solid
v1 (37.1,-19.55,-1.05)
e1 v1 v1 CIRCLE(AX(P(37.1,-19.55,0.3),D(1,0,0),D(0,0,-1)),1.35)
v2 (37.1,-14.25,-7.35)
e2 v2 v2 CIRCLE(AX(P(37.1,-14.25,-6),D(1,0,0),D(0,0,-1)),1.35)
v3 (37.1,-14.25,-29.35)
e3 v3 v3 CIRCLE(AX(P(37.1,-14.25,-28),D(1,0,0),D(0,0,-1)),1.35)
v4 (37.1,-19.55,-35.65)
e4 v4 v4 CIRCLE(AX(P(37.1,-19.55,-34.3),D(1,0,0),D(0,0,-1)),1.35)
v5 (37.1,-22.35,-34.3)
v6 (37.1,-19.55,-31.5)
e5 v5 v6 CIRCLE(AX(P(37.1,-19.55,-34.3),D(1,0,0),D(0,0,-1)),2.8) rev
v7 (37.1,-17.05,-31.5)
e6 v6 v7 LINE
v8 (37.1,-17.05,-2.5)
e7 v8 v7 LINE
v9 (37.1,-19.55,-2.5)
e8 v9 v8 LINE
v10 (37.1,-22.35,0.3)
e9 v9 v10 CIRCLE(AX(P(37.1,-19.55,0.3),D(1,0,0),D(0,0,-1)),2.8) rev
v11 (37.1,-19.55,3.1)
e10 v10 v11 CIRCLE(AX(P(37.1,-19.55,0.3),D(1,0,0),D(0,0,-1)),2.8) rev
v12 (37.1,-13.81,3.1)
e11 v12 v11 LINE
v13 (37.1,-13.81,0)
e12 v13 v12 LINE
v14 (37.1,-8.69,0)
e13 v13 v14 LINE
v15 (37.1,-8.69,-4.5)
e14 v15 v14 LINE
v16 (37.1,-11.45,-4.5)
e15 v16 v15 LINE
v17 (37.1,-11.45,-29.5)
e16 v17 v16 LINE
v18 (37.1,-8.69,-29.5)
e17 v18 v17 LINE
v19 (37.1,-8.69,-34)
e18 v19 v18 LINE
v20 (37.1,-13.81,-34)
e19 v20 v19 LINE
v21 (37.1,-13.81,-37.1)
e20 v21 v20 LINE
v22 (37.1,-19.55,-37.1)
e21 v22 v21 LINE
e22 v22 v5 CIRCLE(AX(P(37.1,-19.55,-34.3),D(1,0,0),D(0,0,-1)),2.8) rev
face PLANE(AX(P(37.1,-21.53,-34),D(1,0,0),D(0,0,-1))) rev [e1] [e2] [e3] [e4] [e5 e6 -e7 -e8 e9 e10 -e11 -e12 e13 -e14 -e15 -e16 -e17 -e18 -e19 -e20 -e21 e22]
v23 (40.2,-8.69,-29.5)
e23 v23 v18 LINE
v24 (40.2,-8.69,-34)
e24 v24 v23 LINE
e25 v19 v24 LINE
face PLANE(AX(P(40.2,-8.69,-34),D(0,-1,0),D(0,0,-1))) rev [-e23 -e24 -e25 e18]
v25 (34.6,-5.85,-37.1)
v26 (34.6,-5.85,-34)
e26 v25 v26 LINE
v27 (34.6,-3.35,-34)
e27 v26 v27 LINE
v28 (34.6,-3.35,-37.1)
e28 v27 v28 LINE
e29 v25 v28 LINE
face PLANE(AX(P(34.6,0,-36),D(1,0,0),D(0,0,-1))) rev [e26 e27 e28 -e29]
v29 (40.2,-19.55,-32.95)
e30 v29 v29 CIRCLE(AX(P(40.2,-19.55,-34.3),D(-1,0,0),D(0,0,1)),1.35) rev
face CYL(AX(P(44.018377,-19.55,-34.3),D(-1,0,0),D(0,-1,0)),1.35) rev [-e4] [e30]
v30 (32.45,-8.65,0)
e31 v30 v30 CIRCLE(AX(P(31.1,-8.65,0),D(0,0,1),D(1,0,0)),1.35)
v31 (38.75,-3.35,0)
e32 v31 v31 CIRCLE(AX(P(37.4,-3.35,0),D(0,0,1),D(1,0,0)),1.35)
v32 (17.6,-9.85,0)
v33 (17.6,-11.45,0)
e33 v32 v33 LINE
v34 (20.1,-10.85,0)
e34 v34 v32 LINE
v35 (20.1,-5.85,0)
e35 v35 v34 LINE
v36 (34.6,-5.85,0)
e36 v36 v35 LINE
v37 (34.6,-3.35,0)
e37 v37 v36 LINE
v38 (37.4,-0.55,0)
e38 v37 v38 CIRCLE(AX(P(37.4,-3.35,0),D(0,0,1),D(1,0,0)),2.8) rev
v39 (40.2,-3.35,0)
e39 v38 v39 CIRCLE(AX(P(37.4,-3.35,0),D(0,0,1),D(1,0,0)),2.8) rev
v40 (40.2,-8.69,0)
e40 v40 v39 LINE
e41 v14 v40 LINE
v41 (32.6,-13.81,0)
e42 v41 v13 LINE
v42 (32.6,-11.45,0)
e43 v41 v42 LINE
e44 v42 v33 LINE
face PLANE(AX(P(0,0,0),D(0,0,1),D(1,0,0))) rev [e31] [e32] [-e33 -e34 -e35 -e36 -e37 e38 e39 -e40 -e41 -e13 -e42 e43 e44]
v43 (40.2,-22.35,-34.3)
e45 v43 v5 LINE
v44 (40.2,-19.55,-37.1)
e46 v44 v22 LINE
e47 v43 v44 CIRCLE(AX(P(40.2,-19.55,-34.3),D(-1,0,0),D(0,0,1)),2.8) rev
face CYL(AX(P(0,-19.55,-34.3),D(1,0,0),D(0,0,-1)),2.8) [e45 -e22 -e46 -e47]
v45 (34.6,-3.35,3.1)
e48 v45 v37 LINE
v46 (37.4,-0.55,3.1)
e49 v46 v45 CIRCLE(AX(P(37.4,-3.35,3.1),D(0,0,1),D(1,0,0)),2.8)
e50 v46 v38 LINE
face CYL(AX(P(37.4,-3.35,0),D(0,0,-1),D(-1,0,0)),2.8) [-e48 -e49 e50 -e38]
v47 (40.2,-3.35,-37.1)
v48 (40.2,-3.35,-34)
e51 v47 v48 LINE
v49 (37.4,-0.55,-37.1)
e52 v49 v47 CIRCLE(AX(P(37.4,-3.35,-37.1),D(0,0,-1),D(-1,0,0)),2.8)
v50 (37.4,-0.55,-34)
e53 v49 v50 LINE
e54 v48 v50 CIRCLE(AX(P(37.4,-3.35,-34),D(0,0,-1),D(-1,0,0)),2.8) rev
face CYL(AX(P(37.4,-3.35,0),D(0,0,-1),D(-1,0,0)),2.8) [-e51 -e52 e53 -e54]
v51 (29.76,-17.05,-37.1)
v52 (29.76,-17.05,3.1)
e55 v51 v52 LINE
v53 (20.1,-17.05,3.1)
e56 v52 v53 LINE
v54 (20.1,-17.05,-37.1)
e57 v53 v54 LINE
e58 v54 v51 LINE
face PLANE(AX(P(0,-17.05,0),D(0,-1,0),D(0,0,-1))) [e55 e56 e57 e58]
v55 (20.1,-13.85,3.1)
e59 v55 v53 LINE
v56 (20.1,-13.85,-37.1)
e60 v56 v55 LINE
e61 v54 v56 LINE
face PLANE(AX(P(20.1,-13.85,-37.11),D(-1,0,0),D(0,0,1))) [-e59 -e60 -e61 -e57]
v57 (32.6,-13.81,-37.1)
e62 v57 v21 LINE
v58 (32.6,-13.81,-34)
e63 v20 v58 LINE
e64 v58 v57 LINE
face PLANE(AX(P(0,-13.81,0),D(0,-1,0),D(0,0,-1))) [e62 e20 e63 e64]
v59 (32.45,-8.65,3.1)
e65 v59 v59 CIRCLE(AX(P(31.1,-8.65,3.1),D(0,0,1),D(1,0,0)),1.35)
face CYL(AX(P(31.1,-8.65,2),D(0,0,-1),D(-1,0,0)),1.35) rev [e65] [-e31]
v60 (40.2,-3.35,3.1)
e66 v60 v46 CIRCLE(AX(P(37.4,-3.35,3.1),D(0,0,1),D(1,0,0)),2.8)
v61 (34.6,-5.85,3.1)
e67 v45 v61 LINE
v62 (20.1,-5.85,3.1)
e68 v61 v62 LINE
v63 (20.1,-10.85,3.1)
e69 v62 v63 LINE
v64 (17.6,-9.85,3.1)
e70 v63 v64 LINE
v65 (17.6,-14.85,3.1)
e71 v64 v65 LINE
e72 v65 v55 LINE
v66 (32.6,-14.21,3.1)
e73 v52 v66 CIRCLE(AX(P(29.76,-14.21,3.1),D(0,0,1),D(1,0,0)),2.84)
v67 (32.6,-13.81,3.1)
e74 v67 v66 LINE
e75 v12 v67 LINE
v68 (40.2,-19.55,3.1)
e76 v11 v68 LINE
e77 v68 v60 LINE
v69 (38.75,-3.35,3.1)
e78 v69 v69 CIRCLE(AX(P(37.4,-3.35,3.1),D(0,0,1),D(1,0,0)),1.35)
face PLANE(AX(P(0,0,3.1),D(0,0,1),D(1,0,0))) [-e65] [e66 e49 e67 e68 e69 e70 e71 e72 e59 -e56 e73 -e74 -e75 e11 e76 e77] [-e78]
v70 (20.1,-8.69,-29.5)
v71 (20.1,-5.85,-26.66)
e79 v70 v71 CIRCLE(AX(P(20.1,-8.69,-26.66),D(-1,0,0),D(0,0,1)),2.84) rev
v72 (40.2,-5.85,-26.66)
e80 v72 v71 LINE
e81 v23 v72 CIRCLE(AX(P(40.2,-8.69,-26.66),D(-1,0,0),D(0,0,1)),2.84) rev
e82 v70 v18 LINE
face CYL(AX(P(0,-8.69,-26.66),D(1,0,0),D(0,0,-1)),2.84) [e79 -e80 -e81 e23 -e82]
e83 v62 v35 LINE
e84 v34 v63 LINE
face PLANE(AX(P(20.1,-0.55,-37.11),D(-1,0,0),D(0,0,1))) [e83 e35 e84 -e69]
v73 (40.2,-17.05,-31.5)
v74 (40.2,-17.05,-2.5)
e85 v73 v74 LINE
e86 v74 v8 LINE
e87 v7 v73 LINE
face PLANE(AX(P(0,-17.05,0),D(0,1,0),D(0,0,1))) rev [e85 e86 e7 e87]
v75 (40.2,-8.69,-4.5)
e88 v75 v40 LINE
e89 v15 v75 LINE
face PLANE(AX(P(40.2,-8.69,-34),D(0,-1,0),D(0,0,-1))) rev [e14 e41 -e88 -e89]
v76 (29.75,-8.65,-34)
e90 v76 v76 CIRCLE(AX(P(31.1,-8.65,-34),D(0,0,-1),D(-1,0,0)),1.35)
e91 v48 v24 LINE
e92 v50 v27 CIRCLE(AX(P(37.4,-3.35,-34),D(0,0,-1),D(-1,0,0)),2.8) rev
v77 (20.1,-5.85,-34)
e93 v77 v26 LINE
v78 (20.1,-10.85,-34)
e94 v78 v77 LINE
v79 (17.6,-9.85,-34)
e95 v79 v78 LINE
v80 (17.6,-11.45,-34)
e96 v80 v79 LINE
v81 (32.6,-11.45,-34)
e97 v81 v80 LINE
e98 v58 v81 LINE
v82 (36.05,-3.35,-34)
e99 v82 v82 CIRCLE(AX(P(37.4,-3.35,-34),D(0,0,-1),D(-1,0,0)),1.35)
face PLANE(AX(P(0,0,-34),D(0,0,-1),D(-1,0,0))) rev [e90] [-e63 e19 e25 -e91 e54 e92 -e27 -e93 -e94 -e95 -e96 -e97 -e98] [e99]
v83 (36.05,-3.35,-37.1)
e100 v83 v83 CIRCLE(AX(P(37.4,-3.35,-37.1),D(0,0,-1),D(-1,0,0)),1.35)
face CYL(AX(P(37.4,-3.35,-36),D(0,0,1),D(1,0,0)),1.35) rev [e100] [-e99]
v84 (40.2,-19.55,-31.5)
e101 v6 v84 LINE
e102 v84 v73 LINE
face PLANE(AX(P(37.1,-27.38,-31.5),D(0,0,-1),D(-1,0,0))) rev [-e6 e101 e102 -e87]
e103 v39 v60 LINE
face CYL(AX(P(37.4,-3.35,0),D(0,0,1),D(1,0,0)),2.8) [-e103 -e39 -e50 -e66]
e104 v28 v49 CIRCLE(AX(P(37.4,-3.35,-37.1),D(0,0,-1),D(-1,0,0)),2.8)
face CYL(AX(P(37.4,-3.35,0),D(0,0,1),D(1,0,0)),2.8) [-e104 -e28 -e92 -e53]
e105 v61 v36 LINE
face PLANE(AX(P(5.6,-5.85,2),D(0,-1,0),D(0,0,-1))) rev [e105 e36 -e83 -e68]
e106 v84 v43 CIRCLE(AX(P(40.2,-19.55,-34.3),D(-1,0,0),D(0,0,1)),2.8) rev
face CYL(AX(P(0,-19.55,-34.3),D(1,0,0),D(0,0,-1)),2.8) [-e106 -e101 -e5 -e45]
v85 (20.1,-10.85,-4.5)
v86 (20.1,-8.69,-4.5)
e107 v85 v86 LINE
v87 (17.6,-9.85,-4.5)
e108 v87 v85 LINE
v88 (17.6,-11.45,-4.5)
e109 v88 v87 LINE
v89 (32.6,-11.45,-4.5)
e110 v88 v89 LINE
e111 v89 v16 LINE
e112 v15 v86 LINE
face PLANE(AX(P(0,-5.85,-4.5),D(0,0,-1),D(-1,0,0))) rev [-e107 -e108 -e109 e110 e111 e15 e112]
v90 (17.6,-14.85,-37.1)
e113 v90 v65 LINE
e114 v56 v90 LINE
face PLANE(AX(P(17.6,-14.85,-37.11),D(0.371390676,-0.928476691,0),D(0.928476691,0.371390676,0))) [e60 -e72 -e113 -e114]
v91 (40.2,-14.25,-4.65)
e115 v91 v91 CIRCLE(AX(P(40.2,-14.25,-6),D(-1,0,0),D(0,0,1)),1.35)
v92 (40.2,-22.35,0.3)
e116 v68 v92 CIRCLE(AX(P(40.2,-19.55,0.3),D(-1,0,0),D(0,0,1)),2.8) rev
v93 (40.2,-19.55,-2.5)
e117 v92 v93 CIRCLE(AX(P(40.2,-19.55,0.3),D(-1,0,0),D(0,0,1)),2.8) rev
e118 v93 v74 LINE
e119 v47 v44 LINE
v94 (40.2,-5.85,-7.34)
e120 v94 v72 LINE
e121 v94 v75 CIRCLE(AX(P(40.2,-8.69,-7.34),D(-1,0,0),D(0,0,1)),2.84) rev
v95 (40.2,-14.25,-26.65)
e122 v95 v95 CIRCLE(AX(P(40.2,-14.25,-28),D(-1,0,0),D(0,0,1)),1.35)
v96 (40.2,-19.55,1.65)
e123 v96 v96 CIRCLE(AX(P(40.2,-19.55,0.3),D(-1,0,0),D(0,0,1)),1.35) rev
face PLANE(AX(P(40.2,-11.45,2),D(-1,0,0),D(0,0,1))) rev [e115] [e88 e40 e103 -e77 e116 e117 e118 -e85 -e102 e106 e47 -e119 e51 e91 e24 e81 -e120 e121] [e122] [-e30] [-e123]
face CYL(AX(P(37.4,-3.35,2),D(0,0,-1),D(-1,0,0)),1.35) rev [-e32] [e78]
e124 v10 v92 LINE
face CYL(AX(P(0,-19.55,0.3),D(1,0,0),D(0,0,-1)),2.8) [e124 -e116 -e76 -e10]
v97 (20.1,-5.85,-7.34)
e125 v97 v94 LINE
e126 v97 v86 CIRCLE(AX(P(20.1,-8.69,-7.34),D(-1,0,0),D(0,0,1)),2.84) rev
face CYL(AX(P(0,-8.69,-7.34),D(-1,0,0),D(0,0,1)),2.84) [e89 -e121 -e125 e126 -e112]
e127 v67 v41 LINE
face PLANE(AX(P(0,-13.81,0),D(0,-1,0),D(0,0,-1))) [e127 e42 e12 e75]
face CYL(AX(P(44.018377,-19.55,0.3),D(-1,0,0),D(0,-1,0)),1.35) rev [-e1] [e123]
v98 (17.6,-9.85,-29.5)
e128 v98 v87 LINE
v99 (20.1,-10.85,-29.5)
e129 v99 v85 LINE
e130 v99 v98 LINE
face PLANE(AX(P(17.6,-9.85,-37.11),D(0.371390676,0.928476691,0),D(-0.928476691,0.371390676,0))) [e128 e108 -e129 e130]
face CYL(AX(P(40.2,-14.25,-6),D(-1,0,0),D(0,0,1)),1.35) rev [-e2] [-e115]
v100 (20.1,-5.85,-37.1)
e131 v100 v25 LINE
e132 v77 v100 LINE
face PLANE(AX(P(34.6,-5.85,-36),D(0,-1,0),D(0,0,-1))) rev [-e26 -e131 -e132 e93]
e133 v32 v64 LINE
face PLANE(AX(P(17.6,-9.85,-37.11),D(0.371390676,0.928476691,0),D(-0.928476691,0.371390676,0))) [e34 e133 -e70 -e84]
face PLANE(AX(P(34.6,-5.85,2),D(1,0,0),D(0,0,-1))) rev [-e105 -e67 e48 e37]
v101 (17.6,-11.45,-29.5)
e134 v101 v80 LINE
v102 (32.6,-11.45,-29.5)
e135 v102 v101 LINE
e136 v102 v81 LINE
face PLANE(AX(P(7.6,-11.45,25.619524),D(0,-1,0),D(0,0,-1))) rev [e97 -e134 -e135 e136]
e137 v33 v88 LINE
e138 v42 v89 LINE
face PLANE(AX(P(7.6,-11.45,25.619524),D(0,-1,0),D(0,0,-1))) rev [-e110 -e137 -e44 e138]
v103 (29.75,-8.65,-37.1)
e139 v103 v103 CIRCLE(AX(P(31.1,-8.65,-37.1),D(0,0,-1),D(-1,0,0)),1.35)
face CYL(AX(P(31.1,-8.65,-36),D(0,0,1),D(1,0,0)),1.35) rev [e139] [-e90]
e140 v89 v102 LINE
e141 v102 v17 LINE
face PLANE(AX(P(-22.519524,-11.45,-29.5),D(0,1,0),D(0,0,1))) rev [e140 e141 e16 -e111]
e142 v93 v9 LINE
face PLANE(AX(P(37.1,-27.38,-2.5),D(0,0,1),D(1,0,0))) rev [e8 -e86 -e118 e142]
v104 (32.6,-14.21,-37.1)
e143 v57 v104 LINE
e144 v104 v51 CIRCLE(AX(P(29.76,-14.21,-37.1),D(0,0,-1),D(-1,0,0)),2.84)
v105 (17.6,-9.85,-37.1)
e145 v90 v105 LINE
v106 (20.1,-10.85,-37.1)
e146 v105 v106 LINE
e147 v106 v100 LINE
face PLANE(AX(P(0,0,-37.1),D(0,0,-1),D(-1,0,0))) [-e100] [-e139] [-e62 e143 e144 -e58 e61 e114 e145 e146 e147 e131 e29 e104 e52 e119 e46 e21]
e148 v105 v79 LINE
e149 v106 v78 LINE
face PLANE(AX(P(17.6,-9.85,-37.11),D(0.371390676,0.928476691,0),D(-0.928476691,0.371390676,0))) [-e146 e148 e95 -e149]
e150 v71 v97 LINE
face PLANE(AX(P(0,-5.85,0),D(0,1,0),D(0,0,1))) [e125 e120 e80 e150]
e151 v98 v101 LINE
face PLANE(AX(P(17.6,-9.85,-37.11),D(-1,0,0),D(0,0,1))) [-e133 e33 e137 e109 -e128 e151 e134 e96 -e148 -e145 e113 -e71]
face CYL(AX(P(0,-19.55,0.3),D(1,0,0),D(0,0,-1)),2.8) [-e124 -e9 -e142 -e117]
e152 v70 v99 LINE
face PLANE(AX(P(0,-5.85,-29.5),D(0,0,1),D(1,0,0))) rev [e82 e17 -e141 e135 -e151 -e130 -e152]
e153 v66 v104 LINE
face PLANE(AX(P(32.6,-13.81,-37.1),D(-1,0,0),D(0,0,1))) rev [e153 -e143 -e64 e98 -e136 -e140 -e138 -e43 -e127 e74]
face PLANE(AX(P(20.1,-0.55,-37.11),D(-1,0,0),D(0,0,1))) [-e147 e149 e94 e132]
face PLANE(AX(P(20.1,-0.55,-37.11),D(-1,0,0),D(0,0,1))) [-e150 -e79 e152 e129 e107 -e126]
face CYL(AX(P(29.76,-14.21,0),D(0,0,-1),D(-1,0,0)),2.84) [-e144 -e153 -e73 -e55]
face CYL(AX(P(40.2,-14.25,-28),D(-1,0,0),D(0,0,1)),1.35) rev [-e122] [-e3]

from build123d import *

# Parameters (mm, degrees)
ESBO_O1_R                  = 1.35
RESSALTO_EXTRUS_O1_DEPTH   = 2
ESBO_O3_W                  = 40.2
ESBO_O3_H                  = 2
RESSALTO_EXTRUS_O2_DEPTH   = 10.08
ESBO_O4_W                  = 3.1
ESBO_O4_H                  = 12.84
RESSALTO_EXTRUS_O3_DEPTH   = 34
CORTE_EXTRUS_O1_DEPTH      = 55.735280213
CORTE_EXTRUS_O1_DEPTH_BACK = 55.735280213
ESBO_O5_R                  = 1.35
ESBO_O7_W                  = 37.1
ESBO_O7_H                  = 3.24
CORTE_EXTRUS_O2_DEPTH      = 2
RESSALTO_EXTRUS_O5_START   = 2
ESBO_O12_R                 = 1.35
RESSALTO_EXTRUS_O5_DEPTH   = 2
ESBO_O18_W                 = 3.1
ESBO_O18_H                 = 3.24
RESSALTO_EXTRUS_O6_DEPTH   = 2
ESBO_O19_W                 = 3.1
ESBO_O19_H                 = 3.24
RESSALTO_EXTRUS_O7_DEPTH   = 2
ESBO_O21_R                 = 1.301764144
ESBO_O21_R_2               = 1.35
RESSALTO_EXTRUS_O8_DEPTH   = 1.1
RESSALTO_EXTRUS_O9_START   = 1.1
ESBO_O22_R                 = 1.35
RESSALTO_EXTRUS_O9_DEPTH   = 1.1
ESBO_O23_W                 = 3.1
ESBO_O23_H                 = 5.6
RESSALTO_EXTRUS_O10_DEPTH  = 5.85
CORTE_EXTRUS_O3_REACH      = 63.173
ESBO_O24_R                 = 1.35
ESBO_O25_W                 = 4.5
ESBO_O25_H                 = 3.1
CORTE_EXTRUS_O6_DEPTH      = 4.48
ESBO_O27_W                 = 3.1
ESBO_O27_H                 = 29
CORTE_EXTRUS_O7_DEPTH      = 4.48
ESBO_O28_W                 = 25
ESBO_O28_H                 = 40.2
CORTE_EXTRUS_O8_DEPTH      = 1.24
ESBO_O29_W                 = 25
ESBO_O29_H                 = 5.6
RESSALTO_EXTRUS_O11_DEPTH  = 34
ESBO_O31_W                 = 3.1
ESBO_O31_H                 = 25
RESSALTO_EXTRUS_O12_DEPTH  = 2.84
ESBO_O32_W                 = 25
ESBO_O32_H                 = 5.6
RESSALTO_EXTRUS_O13_DEPTH  = 34
FILETE1_R                  = 2.84
ESBO_O33_W                 = 5.6
ESBO_O33_H                 = 3.1
CORTE_EXTRUS_O9_DEPTH      = 0.55
ESBO_O35_W                 = 3.1
ESBO_O35_H                 = 5.6
CORTE_EXTRUS_O10_DEPTH     = 5.03
FILETE2_R                  = 2.8
DIVIDIR1_SURFACE_1_BACK    = 61.888
DIVIDIR1_SURFACE_1_DEPTH   = 123.776
DIVIDIR1_SURFACE_2_BACK    = 61.888
DIVIDIR1_SURFACE_2_DEPTH   = 123.776


# Read off the part's stored shape, not the designer's step: Corpo-Excluir/Manter 1
with BuildPart() as part:
    # Esboço1 → Ressalto-extrusão1 (new body)
    with BuildSketch(Plane.XY):
        Polygon((0, 0), (5.6, 0), (5.6, -5.85), (34.6, -5.85), (34.6, 0), (40.2, 0), (40.2, -11.45), (0, -11.45), align=None)
        with Locations((2.8, -3.35)):
            Circle(ESBO_O1_R, mode=Mode.SUBTRACT)
        with Locations((37.4, -3.35)):
            Circle(ESBO_O1_R, mode=Mode.SUBTRACT)
        with Locations((31.1, -8.65)):
            Circle(ESBO_O1_R, mode=Mode.SUBTRACT)
        with Locations((9.1, -8.65)):
            Circle(ESBO_O1_R, mode=Mode.SUBTRACT)
    extrude(amount=RESSALTO_EXTRUS_O1_DEPTH)

    # Esboço3 → Ressalto-extrusão2 (add)
    with BuildSketch(Plane.XZ.offset(11.45)):
        with Locations((20.1, 1)):
            Rectangle(ESBO_O3_W, ESBO_O3_H)
    extrude(amount=RESSALTO_EXTRUS_O2_DEPTH)

    # Esboço4 → Ressalto-extrusão3 (add)
    with BuildSketch(Plane(origin=(0, 0, 0), x_dir=(-1, 0, 0), z_dir=(0, 0, -1))):
        with Locations((-38.65, -15.11)):
            Rectangle(ESBO_O4_W, ESBO_O4_H)
        with Locations((-1.55, -15.11)):
            Rectangle(ESBO_O4_W, ESBO_O4_H)
    extrude(amount=RESSALTO_EXTRUS_O3_DEPTH)

    # Esboço5 → Corte-extrusão1 (cut, two sides: drawn at the far end of the back side and taken through both)
    with BuildSketch(Plane.ZY.offset(-37.1).offset(-CORTE_EXTRUS_O1_DEPTH_BACK)):
        with Locations((-6, -14.25)):
            Circle(ESBO_O5_R)
        with Locations((-28, -14.25)):
            Circle(ESBO_O5_R)
    extrude(amount=CORTE_EXTRUS_O1_DEPTH + CORTE_EXTRUS_O1_DEPTH_BACK, mode=Mode.SUBTRACT)

    # Esboço7 → Corte-extrusão2 (cut)
    with BuildSketch(Plane(origin=(0, 0, 0), x_dir=(-1, 0, 0), z_dir=(0, 0, -1))):
        with Locations((-18.55, -19.91)):
            Rectangle(ESBO_O7_W, ESBO_O7_H)
    extrude(amount=-CORTE_EXTRUS_O2_DEPTH, mode=Mode.SUBTRACT)

    # Esboço12 → Ressalto-extrusão5 (add)
    with BuildSketch(Plane(origin=(0, 0, -34), x_dir=(-1, 0, 0), z_dir=(0, 0, -1)).offset(RESSALTO_EXTRUS_O5_START)):
        Polygon((-5.6, 0), (0, 0), (0, -18.29), (-40.2, -18.29), (-40.2, 0), (-34.6, 0), (-34.6, -5.85), (-5.6, -5.85), align=None)
        with Locations(Location((-31.1, -8.65, 0), (0, 0, 180))):
            Circle(ESBO_O12_R, mode=Mode.SUBTRACT)
        with Locations(Location((-9.1, -8.65, 0), (0, 0, 180))):
            Circle(ESBO_O12_R, mode=Mode.SUBTRACT)
        with Locations(Location((-2.8, -3.35, 0), (0, 0, 180))):
            Circle(ESBO_O12_R, mode=Mode.SUBTRACT)
        with Locations(Location((-37.4, -3.35, 0), (0, 0, 180))):
            Circle(ESBO_O12_R, mode=Mode.SUBTRACT)
    extrude(amount=-RESSALTO_EXTRUS_O5_DEPTH)

    # Esboço18 → Ressalto-extrusão6 (add)
    with BuildSketch(Plane.XY):
        with Locations((1.55, -19.91)):
            Rectangle(ESBO_O18_W, ESBO_O18_H)
    extrude(amount=RESSALTO_EXTRUS_O6_DEPTH)

    # Esboço19 → Ressalto-extrusão7 (add)
    with BuildSketch(Plane(origin=(0, 0, -34), x_dir=(-1, 0, 0), z_dir=(0, 0, -1))):
        with Locations((-1.55, -19.91)):
            Rectangle(ESBO_O19_W, ESBO_O19_H)
        with Locations((-38.65, -19.91)):
            Rectangle(ESBO_O19_W, ESBO_O19_H)
    extrude(amount=RESSALTO_EXTRUS_O7_DEPTH)

    # Esboço21 → Ressalto-extrusão8 (add)
    with BuildSketch(Plane.XY.offset(2)):
        Polygon((37.1, -21.53), (40.2, -21.53), (40.2, 0), (34.6, 0), (34.6, -5.85), (5.6, -5.85), (5.6, 0), (0, 0), (0, -21.53), (3.1, -21.53), (3.1, -18.29), (37.1, -18.29), align=None)
        with Locations((2.8, -3.35)):
            Circle(ESBO_O21_R, mode=Mode.SUBTRACT)
        with Locations((9.1, -8.65)):
            Circle(ESBO_O21_R_2, mode=Mode.SUBTRACT)
        with Locations((31.1, -8.65)):
            Circle(ESBO_O21_R_2, mode=Mode.SUBTRACT)
        with Locations((37.4, -3.35)):
            Circle(ESBO_O21_R_2, mode=Mode.SUBTRACT)
    extrude(amount=RESSALTO_EXTRUS_O8_DEPTH)

    # Esboço22 → Ressalto-extrusão9 (add)
    with BuildSketch(Plane(origin=(0, 0, -36), x_dir=(-1, 0, 0), z_dir=(0, 0, -1)).offset(RESSALTO_EXTRUS_O9_START)):
        Polygon((-5.6, 0), (0, 0), (0, -21.53), (-3.1, -21.53), (-3.1, -18.29), (-37.1, -18.29), (-37.1, -21.53), (-40.2, -21.53), (-40.2, 0), (-34.6, 0), (-34.6, -5.85), (-5.6, -5.85), align=None)
        with Locations(Location((-37.4, -3.35, 0), (0, 0, 180))):
            Circle(ESBO_O22_R, mode=Mode.SUBTRACT)
        with Locations(Location((-31.1, -8.65, 0), (0, 0, 180))):
            Circle(ESBO_O22_R, mode=Mode.SUBTRACT)
        with Locations(Location((-9.1, -8.65, 0), (0, 0, 180))):
            Circle(ESBO_O22_R, mode=Mode.SUBTRACT)
        with Locations(Location((-2.8, -3.35, 0), (0, 0, 180))):
            Circle(ESBO_O22_R, mode=Mode.SUBTRACT)
    extrude(amount=-RESSALTO_EXTRUS_O9_DEPTH)

    # Esboço23 → Ressalto-extrusão10 (add)
    with BuildSketch(Plane.XZ.offset(21.53)):
        with Locations((1.55, 0.3)):
            Rectangle(ESBO_O23_W, ESBO_O23_H)
        with Locations((1.55, -34.3)):
            Rectangle(ESBO_O23_W, ESBO_O23_H)
        with Locations((38.65, -34.3)):
            Rectangle(ESBO_O23_W, ESBO_O23_H)
        with Locations((38.65, 0.3)):
            Rectangle(ESBO_O23_W, ESBO_O23_H)
    extrude(amount=RESSALTO_EXTRUS_O10_DEPTH)

    # Corte-extrusão3: up to this face of the body (flat: up to its plane)
    corte_extrus_o3_end = Plane(part.part.faces().sort_by_distance((40.2, -15.177512698, -17))[0])
    # Esboço24 → Corte-extrusão3 (cut, up to the picked face)
    with BuildSketch(Plane.ZY, mode=Mode.PRIVATE) as corte_extrus_o3_sk1:
        with Locations(Location((-34.3, -19.55, 0), (0, 0, 270))):
            Circle(ESBO_O24_R)
    corte_extrus_o3_tool1 = split(extrude(corte_extrus_o3_sk1.sketch, amount=-CORTE_EXTRUS_O3_REACH, mode=Mode.PRIVATE), bisect_by=corte_extrus_o3_end, keep=Keep.BOTH, mode=Mode.PRIVATE)
    # Esboço24 → Corte-extrusão3 (cut, up to the picked face)
    with BuildSketch(Plane.ZY, mode=Mode.PRIVATE) as corte_extrus_o3_sk2:
        with Locations(Location((0.3, -19.55, 0), (0, 0, 270))):
            Circle(ESBO_O24_R)
    corte_extrus_o3_tool2 = split(extrude(corte_extrus_o3_sk2.sketch, amount=-CORTE_EXTRUS_O3_REACH, mode=Mode.PRIVATE), bisect_by=corte_extrus_o3_end, keep=Keep.BOTH, mode=Mode.PRIVATE)
    add(corte_extrus_o3_tool1.solids().sort_by(Axis((0, -19.55, -34.3), (1, 0, 0)))[0], mode=Mode.SUBTRACT)
    add(corte_extrus_o3_tool2.solids().sort_by(Axis((0, -19.55, 0.3), (1, 0, 0)))[0], mode=Mode.SUBTRACT)

    # Esboço25 → Corte-extrusão6 (cut)
    with BuildSketch(Plane.XZ.offset(18.29)):
        with Locations((5.35, -35.55)):
            Rectangle(ESBO_O25_W, ESBO_O25_H)
        with Locations((34.85, -35.55)):
            Rectangle(ESBO_O25_W, ESBO_O25_H)
        with Locations((34.85, 1.55)):
            Rectangle(ESBO_O25_W, ESBO_O25_H)
        with Locations((5.35, 1.55)):
            Rectangle(ESBO_O25_W, ESBO_O25_H)
    extrude(amount=-CORTE_EXTRUS_O6_DEPTH, mode=Mode.SUBTRACT)

    # Esboço27 → Corte-extrusão7 (cut)
    with BuildSketch(Plane.XZ.offset(21.53)):
        with Locations((1.55, -17)):
            Rectangle(ESBO_O27_W, ESBO_O27_H)
        with Locations((38.65, -17)):
            Rectangle(ESBO_O27_W, ESBO_O27_H)
    extrude(amount=-CORTE_EXTRUS_O7_DEPTH, mode=Mode.SUBTRACT)

    # Esboço28 → Corte-extrusão8 (cut)
    with BuildSketch(Plane.XZ.offset(18.29)):
        with Locations((20.1, -17)):
            Rectangle(ESBO_O28_W, ESBO_O28_H)
    extrude(amount=-CORTE_EXTRUS_O8_DEPTH, mode=Mode.SUBTRACT)

    # Esboço29 → Ressalto-extrusão11 (add)
    with BuildSketch(Plane.XY.offset(-34)):
        with Locations((20.1, -14.25)):
            Rectangle(ESBO_O29_W, ESBO_O29_H)
    extrude(amount=RESSALTO_EXTRUS_O11_DEPTH)

    # Esboço31 → Ressalto-extrusão12 (add)
    with BuildSketch(Plane(origin=(0, -8.69, 0), x_dir=(1, 0, 0), z_dir=(0, 1, 0))):
        with Locations((1.55, 17)):
            Rectangle(ESBO_O31_W, ESBO_O31_H)
        with Locations((38.65, 17)):
            Rectangle(ESBO_O31_W, ESBO_O31_H)
    extrude(amount=RESSALTO_EXTRUS_O12_DEPTH)

    # Esboço32 → Ressalto-extrusão13 (add)
    with BuildSketch(Plane.ZY.offset(-37.1)):
        with Locations((-17, -8.65)):
            Rectangle(ESBO_O32_W, ESBO_O32_H)
    extrude(amount=RESSALTO_EXTRUS_O13_DEPTH)

    # Filete1
    filete1_edges = [part.edges().sort_by_distance(p)[0] for p in [
        (32.6, -17.05, -17),
        (7.6, -17.05, -17),
        (20.1, -5.85, -29.5),
        (20.1, -5.85, -4.5),
    ]]
    fillet(filete1_edges, radius=FILETE1_R)

    # Esboço33 → Corte-extrusão9 (cut)
    with BuildSketch(Plane(origin=(0, 0, 0), x_dir=(1, 0, 0), z_dir=(0, 1, 0))):
        with Locations((2.8, 35.55)):
            Rectangle(ESBO_O33_W, ESBO_O33_H)
        with Locations((37.4, 35.55)):
            Rectangle(ESBO_O33_W, ESBO_O33_H)
        with Locations((37.4, -1.55)):
            Rectangle(ESBO_O33_W, ESBO_O33_H)
        with Locations((2.8, -1.55)):
            Rectangle(ESBO_O33_W, ESBO_O33_H)
    extrude(amount=-CORTE_EXTRUS_O9_DEPTH, mode=Mode.SUBTRACT)

    # Esboço35 → Corte-extrusão10 (cut)
    with BuildSketch(Plane.XZ.offset(27.38)):
        with Locations((1.55, 0.3)):
            Rectangle(ESBO_O35_W, ESBO_O35_H)
        with Locations((38.65, 0.3)):
            Rectangle(ESBO_O35_W, ESBO_O35_H)
        with Locations((38.65, -34.3)):
            Rectangle(ESBO_O35_W, ESBO_O35_H)
        with Locations((1.55, -34.3)):
            Rectangle(ESBO_O35_W, ESBO_O35_H)
    extrude(amount=-CORTE_EXTRUS_O10_DEPTH, mode=Mode.SUBTRACT)

    # Filete2
    filete2_edges = [part.edges().sort_by_distance(p)[0] for p in [
        (34.6, -0.55, 1.55),
        (40.2, -0.55, 1.55),
        (0, -0.55, 1.55),
        (5.6, -0.55, 1.55),
        (40.2, -0.55, -35.55),
        (34.6, -0.55, -35.55),
        (5.6, -0.55, -35.55),
        (0, -0.55, -35.55),
        (1.55, -22.35, -31.5),
        (1.55, -22.35, -37.1),
        (38.65, -22.35, -31.5),
        (38.65, -22.35, -37.1),
        (38.65, -22.35, 3.1),
        (38.65, -22.35, -2.5),
        (1.55, -22.35, -2.5),
        (1.55, -22.35, 3.1),
    ]]
    fillet(filete2_edges, radius=FILETE2_R - 0.0001)  # a hair under: the kernel refuses the full size


with BuildPart() as body_2:
    # Dividir1: the piece behind the surface
    add(part.part)
    # Dividir1 surface: a surface, the sketch's curves swept straight by 123.776 mm
    with BuildLine(Plane.XY.offset(3.1).offset(-DIVIDIR1_SURFACE_1_BACK), mode=Mode.PRIVATE) as dividir1_surface_1_path:
        Line((20.1, -0.55), (20.1, -10.85))
        Line((20.1, -10.85), (17.6, -9.85))
        Line((17.6, -9.85), (17.6, -14.85))
        Line((17.6, -14.85), (20.1, -13.85))
        Line((20.1, -13.85), (20.1, -22.35))
    dividir1_surface_1 = Shell.extrude(dividir1_surface_1_path.wire(), (0 * DIVIDIR1_SURFACE_1_DEPTH, 0 * DIVIDIR1_SURFACE_1_DEPTH, 1 * DIVIDIR1_SURFACE_1_DEPTH))
    split(bisect_by=dividir1_surface_1, keep=Keep.BOTTOM)


with BuildPart() as part_1:
    add(part.part)

    # Dividir1: split by a surface, the side it looks to stays
    # Dividir1 surface: a surface, the sketch's curves swept straight by 123.776 mm
    with BuildLine(Plane.XY.offset(3.1).offset(-DIVIDIR1_SURFACE_2_BACK), mode=Mode.PRIVATE) as dividir1_surface_2_path:
        Line((20.1, -0.55), (20.1, -10.85))
        Line((20.1, -10.85), (17.6, -9.85))
        Line((17.6, -9.85), (17.6, -14.85))
        Line((17.6, -14.85), (20.1, -13.85))
        Line((20.1, -13.85), (20.1, -22.35))
    dividir1_surface_2 = Shell.extrude(dividir1_surface_2_path.wire(), (0 * DIVIDIR1_SURFACE_2_DEPTH, 0 * DIVIDIR1_SURFACE_2_DEPTH, 1 * DIVIDIR1_SURFACE_2_DEPTH))
    split(bisect_by=dividir1_surface_2, keep=Keep.TOP)


solid = part_1.part
